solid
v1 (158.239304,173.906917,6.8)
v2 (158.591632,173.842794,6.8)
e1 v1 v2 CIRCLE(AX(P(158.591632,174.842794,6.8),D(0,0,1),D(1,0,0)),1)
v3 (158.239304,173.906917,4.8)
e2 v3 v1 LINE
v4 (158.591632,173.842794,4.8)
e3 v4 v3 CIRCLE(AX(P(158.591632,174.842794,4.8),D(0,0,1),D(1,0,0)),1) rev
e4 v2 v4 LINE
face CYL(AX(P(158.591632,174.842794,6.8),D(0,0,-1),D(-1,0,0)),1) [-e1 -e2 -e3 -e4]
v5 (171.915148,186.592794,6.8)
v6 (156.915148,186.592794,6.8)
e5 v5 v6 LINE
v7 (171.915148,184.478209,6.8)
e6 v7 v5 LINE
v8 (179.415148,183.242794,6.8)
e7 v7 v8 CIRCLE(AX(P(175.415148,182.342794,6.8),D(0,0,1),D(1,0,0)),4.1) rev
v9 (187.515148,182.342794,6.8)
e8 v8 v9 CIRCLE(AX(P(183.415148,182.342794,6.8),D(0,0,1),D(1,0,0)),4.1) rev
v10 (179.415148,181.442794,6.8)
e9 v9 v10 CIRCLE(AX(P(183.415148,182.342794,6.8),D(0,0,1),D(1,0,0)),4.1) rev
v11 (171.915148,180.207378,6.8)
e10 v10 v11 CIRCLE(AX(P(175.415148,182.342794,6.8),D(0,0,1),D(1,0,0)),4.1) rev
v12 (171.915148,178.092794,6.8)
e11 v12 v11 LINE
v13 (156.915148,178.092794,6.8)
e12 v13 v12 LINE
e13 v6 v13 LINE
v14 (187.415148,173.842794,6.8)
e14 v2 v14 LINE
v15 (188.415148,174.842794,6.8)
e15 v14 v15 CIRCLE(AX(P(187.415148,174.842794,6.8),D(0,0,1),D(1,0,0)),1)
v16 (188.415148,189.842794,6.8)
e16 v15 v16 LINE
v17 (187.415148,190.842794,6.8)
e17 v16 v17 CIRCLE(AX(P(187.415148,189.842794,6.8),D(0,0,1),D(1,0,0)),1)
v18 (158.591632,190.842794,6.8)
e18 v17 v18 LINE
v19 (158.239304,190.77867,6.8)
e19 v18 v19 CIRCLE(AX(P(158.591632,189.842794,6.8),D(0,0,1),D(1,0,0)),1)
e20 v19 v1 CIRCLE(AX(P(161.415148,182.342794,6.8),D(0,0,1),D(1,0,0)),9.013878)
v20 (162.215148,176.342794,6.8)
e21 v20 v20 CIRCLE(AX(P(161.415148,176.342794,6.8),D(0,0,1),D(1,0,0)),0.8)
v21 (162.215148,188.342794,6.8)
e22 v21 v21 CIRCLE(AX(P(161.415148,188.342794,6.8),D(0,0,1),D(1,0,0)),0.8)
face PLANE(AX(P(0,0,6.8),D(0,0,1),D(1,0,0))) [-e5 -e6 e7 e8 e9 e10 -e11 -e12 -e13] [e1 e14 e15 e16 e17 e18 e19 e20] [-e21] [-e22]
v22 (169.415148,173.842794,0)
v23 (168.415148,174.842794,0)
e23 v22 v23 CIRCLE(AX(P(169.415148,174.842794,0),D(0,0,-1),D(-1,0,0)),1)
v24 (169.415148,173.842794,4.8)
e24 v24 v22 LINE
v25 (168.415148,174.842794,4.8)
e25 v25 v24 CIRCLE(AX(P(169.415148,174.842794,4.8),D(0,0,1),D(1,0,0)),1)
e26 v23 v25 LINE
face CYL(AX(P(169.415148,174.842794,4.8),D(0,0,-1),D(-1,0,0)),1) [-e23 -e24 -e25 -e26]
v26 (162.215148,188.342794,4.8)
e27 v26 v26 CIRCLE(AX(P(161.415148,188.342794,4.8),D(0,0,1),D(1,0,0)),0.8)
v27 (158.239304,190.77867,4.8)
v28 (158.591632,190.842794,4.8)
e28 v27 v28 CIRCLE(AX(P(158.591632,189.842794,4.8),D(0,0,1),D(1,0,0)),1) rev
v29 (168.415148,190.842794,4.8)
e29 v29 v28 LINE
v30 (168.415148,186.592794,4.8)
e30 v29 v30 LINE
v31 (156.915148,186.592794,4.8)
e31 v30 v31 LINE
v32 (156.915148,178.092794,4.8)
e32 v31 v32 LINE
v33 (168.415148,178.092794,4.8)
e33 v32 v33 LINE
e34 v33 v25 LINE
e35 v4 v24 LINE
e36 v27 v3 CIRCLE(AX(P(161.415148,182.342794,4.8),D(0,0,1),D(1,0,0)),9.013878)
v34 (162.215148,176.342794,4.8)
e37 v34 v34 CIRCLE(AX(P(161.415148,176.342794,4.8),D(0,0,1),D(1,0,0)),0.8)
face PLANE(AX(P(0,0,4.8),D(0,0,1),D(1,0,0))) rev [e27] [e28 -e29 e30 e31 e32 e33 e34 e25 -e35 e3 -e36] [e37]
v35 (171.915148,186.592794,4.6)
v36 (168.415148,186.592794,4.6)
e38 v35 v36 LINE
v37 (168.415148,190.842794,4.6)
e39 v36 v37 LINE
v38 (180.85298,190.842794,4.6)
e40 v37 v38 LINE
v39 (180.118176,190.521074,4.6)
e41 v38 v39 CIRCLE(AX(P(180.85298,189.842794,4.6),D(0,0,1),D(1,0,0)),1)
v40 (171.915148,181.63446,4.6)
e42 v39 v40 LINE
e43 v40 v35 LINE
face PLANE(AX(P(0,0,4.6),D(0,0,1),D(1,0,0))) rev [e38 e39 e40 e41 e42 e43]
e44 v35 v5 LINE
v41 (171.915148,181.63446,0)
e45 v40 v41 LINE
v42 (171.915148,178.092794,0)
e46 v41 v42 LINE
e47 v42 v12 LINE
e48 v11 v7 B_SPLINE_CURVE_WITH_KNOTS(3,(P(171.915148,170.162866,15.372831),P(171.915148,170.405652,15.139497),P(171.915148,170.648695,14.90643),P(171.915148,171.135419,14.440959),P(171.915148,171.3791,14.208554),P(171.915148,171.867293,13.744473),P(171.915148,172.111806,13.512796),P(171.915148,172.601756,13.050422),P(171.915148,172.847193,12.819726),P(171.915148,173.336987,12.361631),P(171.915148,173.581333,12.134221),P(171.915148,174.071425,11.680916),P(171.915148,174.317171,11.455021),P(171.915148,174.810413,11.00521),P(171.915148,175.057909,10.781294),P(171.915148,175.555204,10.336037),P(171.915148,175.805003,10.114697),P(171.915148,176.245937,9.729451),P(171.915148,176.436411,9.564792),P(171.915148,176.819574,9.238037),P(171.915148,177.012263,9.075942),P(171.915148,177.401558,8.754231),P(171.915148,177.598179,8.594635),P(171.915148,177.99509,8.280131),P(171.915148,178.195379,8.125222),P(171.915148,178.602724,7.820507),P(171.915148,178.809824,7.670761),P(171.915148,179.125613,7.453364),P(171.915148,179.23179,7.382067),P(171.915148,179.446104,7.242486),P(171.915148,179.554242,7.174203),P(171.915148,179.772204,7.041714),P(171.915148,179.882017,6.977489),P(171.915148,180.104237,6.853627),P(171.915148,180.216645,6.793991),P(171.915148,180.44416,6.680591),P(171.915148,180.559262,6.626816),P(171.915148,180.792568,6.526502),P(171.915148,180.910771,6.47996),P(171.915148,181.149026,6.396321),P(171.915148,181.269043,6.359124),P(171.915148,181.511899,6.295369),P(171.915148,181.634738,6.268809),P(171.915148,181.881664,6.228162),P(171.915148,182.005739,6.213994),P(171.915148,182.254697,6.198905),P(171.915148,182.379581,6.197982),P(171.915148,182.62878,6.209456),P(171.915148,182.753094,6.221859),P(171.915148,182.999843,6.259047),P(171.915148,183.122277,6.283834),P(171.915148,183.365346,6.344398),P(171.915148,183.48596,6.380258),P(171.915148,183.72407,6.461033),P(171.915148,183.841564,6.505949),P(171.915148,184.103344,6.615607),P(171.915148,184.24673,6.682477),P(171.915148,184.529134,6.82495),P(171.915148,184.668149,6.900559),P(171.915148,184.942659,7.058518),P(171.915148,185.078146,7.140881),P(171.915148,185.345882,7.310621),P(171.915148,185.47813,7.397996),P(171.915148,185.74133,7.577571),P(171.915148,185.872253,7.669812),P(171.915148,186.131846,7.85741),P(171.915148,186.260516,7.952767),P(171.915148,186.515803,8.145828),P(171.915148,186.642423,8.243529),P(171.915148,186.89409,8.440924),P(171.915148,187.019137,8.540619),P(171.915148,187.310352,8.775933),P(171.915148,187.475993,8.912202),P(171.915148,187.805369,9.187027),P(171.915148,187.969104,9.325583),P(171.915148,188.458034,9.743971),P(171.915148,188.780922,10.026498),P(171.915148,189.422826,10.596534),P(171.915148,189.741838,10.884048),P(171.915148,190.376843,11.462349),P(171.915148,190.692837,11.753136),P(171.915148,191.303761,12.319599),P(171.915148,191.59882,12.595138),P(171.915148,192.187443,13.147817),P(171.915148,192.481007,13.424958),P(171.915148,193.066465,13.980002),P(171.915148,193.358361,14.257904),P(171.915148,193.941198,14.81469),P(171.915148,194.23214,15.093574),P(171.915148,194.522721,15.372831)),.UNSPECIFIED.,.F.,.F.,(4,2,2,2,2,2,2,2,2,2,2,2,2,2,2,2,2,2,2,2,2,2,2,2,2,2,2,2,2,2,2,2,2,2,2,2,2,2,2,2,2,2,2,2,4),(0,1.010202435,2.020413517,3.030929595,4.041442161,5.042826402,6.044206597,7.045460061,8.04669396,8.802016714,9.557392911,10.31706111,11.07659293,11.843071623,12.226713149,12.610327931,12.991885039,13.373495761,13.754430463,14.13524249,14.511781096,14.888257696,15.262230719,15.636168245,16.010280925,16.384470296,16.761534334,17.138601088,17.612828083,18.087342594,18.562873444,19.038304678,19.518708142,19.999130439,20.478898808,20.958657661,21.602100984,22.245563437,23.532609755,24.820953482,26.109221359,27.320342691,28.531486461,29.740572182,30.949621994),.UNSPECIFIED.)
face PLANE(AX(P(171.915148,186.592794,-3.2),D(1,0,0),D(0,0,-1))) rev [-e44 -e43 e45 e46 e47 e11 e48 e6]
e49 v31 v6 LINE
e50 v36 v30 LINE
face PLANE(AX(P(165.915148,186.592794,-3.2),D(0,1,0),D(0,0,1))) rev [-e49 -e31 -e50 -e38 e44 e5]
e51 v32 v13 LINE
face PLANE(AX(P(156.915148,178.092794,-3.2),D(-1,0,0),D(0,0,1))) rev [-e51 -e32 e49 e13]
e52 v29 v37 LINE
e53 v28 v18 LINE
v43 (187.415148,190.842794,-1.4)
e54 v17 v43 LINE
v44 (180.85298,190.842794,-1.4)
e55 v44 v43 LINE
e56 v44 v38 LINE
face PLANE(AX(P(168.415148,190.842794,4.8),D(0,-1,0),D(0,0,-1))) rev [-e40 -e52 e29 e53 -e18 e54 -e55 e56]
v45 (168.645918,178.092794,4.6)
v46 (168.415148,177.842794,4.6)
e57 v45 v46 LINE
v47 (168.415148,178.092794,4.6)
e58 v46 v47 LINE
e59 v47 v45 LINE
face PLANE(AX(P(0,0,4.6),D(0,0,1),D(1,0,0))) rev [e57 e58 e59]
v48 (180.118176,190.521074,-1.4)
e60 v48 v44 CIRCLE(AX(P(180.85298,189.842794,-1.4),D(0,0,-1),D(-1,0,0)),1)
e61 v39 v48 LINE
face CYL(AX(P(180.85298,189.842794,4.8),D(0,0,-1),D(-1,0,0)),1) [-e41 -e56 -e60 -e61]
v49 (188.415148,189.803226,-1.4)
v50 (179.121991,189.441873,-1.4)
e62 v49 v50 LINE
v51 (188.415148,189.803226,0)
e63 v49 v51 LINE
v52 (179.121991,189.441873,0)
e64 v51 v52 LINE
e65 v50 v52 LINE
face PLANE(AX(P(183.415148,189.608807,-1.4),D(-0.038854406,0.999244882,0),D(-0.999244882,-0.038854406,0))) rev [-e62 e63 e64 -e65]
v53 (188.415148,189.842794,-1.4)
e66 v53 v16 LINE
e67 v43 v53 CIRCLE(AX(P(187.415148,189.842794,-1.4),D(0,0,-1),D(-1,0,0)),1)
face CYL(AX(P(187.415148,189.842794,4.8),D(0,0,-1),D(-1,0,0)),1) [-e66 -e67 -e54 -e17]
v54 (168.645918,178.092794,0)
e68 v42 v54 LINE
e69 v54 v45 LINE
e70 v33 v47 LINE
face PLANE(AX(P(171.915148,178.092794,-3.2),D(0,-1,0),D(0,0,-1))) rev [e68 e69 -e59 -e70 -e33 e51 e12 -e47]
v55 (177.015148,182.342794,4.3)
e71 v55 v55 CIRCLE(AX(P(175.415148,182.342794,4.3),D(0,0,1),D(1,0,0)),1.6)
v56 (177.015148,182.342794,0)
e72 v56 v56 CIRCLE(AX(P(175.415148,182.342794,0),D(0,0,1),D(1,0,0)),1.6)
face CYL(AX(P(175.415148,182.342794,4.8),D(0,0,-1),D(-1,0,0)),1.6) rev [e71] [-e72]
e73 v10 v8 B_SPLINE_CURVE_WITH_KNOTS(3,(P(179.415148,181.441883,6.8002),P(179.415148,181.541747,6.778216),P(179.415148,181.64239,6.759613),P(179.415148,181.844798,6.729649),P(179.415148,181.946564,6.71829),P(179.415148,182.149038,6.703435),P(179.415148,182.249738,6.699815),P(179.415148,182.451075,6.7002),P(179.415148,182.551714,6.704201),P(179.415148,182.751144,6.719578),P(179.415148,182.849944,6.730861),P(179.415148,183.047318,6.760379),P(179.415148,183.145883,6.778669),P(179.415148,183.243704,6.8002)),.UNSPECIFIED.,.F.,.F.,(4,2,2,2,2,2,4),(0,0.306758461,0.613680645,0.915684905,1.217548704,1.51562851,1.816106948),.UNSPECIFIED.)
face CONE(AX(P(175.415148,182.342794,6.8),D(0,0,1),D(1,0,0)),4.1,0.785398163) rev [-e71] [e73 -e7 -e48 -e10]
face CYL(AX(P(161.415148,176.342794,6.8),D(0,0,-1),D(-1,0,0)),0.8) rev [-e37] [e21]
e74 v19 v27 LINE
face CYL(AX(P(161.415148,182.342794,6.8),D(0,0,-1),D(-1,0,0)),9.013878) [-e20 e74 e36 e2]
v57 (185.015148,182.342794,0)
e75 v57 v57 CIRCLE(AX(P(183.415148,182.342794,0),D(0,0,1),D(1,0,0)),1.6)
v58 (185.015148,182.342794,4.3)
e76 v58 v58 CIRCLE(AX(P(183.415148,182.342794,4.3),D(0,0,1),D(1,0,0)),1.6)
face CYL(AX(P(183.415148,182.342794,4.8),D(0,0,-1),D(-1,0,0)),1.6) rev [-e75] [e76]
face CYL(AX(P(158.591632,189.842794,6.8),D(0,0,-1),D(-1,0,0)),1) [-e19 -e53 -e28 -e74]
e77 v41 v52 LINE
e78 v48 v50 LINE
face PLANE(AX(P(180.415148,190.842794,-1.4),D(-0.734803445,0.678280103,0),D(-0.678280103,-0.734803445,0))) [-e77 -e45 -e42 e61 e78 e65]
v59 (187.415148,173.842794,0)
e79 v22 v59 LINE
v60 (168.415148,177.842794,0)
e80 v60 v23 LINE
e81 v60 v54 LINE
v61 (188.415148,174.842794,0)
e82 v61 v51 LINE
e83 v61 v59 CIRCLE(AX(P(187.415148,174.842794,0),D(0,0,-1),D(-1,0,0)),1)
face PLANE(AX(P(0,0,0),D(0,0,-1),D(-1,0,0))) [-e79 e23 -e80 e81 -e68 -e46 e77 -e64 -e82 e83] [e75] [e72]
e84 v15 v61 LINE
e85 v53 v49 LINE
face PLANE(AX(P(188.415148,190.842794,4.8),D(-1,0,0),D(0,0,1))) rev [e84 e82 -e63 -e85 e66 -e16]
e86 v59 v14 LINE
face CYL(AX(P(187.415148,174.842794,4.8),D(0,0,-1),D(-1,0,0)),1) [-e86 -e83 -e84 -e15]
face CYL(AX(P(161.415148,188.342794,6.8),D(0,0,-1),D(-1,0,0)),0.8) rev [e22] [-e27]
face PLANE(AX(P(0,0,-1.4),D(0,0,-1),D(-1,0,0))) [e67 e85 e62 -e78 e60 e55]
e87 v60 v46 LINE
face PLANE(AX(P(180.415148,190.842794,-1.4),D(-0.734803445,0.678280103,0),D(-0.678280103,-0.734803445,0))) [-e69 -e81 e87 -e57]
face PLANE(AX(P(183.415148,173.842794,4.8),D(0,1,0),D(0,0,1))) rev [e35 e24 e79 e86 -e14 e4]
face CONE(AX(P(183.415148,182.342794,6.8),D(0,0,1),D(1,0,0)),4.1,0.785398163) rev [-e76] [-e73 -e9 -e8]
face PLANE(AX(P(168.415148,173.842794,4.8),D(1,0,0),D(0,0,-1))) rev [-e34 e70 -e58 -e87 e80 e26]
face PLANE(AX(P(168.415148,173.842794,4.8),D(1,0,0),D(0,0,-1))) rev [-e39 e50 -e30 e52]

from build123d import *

# Parameters (mm, degrees)
SKETCH4_R               = 1.6
BOSS_EXTRUDE1_DEPTH     = 4.8
SKETCH5_R               = 1.6
SKETCH5_R_2             = 0.8
BOSS_EXTRUDE3_DEPTH     = 2
BOSS_EXTRUDE4_DEPTH     = 1.4
CUT_EXTRUDE1_DEPTH      = 1.4
CUT_EXTRUDE1_DEPTH_BACK = 4.6
CHAMFER1_SIZE           = 2.5
FILLET1_R               = 1
CUT_EXTRUDE2_DEPTH      = 10


with BuildPart() as part:
    # Sketch4 → Boss-Extrude1 (new body)
    with BuildSketch(Plane.XY):
        Polygon((183.415148292, 173.842793615), (168.415148292, 173.842793615), (168.415148292, 190.842793615), (183.415148292, 190.842793615), (188.415148292, 190.842793615), (188.415148292, 173.842793615), align=None)
        with Locations((175.415148292, 182.342793615)):
            Circle(SKETCH4_R, mode=Mode.SUBTRACT)
        with Locations((183.415148292, 182.342793615)):
            Circle(SKETCH4_R, mode=Mode.SUBTRACT)
    extrude(amount=BOSS_EXTRUDE1_DEPTH)

    # Sketch5 → Boss-Extrude3 (add)
    with BuildSketch(Plane.XY.offset(4.8)):
        with BuildLine():
            ThreePointArc((158.415148292, 190.842793615), (152.401270103, 182.342793615), (158.415148292, 173.842793615))
            Line((158.415148292, 173.842793615), (188.415148292, 173.842793615))
            Line((188.415148292, 173.842793615), (188.415148292, 190.842793615))
            Line((188.415148292, 190.842793615), (158.415148292, 190.842793615))
        make_face()
        with Locations((175.415148292, 182.342793615)):
            Circle(SKETCH5_R, mode=Mode.SUBTRACT)
        with Locations((183.415148292, 182.342793615)):
            Circle(SKETCH5_R, mode=Mode.SUBTRACT)
        with Locations((161.415148292, 176.342793615)):
            Circle(SKETCH5_R_2, mode=Mode.SUBTRACT)
        with Locations((161.415148292, 188.342793615)):
            Circle(SKETCH5_R_2, mode=Mode.SUBTRACT)
    extrude(amount=BOSS_EXTRUDE3_DEPTH)

    # Sketch6 → Boss-Extrude4 (add)
    with BuildSketch(Plane(origin=(0, 0, 0), x_dir=(-1, 0, 0), z_dir=(0, 0, -1))):
        Polygon((-183.415148292, 189.608806881), (-168.415148292, 189.02555036), (-168.415148292, 190.842793615), (-183.415148292, 190.842793615), (-188.415148292, 190.842793615), (-188.415148292, 189.803225722), align=None)
    extrude(amount=BOSS_EXTRUDE4_DEPTH)

    # Sketch8 → Cut-Extrude1 (cut, two sides: drawn at the far end of the back side and taken through both)
    with BuildSketch(Plane(origin=(0, 0, 0), x_dir=(-1, 0, 0), z_dir=(0, 0, -1)).offset(-CUT_EXTRUDE1_DEPTH_BACK)):
        Polygon((-180.415148292, 190.842793615), (-168.415148292, 177.842793615), (-168.415148292, 190.842793615), align=None)
    extrude(amount=CUT_EXTRUDE1_DEPTH + CUT_EXTRUDE1_DEPTH_BACK, mode=Mode.SUBTRACT)

    # Chamfer1
    # the kernel refuses this chamfer: 2.5 mm, written as the material it takes off along each edge
    with BuildSketch(Plane(origin=(175.415148292, 182.342793615, 6.8), x_dir=(1, 0, 0), z_dir=(0, -1, 0))) as chamfer1_piece_1:
        Polygon((1.6 + CHAMFER1_SIZE, 0), (1.6, -CHAMFER1_SIZE), (1.6, 0), align=None)
    revolve(axis=Axis((175.415148292, 182.342793615, 6.8), (0, 0, 1)), mode=Mode.SUBTRACT)
    with BuildSketch(Plane(origin=(183.415148292, 182.342793615, 6.8), x_dir=(1, 0, 0), z_dir=(0, -1, 0))) as chamfer1_piece_2:
        Polygon((1.6 + CHAMFER1_SIZE, 0), (1.6, -CHAMFER1_SIZE), (1.6, 0), align=None)
    revolve(axis=Axis((183.415148292, 182.342793615, 6.8), (0, 0, 1)), mode=Mode.SUBTRACT)

    # Fillet1
    fillet1_edges = [part.edges().sort_by_distance(p)[0] for p in [
        (168.415148292, 173.842793615, 2.4),
        (188.415148292, 190.842793615, 2.7),
        (188.415148292, 173.842793615, 3.4),
        (158.415148292, 190.842793615, 5.8),
        (158.415148292, 173.842793615, 5.8),
        (180.415148292, 190.842793615, 1.6),
    ]]
    fillet(fillet1_edges, radius=FILLET1_R)

    # Sketch9 → Cut-Extrude2 (cut)
    with BuildSketch(Plane.XY.offset(6.8)):
        Polygon((165.915148292, 186.592793615), (171.915148292, 186.592793615), (171.915148292, 178.092793615), (165.915148292, 178.092793615), (156.915148292, 178.092793615), (156.915148292, 186.592793615), align=None)
    extrude(amount=-CUT_EXTRUDE2_DEPTH, mode=Mode.SUBTRACT)


solid = part.part
